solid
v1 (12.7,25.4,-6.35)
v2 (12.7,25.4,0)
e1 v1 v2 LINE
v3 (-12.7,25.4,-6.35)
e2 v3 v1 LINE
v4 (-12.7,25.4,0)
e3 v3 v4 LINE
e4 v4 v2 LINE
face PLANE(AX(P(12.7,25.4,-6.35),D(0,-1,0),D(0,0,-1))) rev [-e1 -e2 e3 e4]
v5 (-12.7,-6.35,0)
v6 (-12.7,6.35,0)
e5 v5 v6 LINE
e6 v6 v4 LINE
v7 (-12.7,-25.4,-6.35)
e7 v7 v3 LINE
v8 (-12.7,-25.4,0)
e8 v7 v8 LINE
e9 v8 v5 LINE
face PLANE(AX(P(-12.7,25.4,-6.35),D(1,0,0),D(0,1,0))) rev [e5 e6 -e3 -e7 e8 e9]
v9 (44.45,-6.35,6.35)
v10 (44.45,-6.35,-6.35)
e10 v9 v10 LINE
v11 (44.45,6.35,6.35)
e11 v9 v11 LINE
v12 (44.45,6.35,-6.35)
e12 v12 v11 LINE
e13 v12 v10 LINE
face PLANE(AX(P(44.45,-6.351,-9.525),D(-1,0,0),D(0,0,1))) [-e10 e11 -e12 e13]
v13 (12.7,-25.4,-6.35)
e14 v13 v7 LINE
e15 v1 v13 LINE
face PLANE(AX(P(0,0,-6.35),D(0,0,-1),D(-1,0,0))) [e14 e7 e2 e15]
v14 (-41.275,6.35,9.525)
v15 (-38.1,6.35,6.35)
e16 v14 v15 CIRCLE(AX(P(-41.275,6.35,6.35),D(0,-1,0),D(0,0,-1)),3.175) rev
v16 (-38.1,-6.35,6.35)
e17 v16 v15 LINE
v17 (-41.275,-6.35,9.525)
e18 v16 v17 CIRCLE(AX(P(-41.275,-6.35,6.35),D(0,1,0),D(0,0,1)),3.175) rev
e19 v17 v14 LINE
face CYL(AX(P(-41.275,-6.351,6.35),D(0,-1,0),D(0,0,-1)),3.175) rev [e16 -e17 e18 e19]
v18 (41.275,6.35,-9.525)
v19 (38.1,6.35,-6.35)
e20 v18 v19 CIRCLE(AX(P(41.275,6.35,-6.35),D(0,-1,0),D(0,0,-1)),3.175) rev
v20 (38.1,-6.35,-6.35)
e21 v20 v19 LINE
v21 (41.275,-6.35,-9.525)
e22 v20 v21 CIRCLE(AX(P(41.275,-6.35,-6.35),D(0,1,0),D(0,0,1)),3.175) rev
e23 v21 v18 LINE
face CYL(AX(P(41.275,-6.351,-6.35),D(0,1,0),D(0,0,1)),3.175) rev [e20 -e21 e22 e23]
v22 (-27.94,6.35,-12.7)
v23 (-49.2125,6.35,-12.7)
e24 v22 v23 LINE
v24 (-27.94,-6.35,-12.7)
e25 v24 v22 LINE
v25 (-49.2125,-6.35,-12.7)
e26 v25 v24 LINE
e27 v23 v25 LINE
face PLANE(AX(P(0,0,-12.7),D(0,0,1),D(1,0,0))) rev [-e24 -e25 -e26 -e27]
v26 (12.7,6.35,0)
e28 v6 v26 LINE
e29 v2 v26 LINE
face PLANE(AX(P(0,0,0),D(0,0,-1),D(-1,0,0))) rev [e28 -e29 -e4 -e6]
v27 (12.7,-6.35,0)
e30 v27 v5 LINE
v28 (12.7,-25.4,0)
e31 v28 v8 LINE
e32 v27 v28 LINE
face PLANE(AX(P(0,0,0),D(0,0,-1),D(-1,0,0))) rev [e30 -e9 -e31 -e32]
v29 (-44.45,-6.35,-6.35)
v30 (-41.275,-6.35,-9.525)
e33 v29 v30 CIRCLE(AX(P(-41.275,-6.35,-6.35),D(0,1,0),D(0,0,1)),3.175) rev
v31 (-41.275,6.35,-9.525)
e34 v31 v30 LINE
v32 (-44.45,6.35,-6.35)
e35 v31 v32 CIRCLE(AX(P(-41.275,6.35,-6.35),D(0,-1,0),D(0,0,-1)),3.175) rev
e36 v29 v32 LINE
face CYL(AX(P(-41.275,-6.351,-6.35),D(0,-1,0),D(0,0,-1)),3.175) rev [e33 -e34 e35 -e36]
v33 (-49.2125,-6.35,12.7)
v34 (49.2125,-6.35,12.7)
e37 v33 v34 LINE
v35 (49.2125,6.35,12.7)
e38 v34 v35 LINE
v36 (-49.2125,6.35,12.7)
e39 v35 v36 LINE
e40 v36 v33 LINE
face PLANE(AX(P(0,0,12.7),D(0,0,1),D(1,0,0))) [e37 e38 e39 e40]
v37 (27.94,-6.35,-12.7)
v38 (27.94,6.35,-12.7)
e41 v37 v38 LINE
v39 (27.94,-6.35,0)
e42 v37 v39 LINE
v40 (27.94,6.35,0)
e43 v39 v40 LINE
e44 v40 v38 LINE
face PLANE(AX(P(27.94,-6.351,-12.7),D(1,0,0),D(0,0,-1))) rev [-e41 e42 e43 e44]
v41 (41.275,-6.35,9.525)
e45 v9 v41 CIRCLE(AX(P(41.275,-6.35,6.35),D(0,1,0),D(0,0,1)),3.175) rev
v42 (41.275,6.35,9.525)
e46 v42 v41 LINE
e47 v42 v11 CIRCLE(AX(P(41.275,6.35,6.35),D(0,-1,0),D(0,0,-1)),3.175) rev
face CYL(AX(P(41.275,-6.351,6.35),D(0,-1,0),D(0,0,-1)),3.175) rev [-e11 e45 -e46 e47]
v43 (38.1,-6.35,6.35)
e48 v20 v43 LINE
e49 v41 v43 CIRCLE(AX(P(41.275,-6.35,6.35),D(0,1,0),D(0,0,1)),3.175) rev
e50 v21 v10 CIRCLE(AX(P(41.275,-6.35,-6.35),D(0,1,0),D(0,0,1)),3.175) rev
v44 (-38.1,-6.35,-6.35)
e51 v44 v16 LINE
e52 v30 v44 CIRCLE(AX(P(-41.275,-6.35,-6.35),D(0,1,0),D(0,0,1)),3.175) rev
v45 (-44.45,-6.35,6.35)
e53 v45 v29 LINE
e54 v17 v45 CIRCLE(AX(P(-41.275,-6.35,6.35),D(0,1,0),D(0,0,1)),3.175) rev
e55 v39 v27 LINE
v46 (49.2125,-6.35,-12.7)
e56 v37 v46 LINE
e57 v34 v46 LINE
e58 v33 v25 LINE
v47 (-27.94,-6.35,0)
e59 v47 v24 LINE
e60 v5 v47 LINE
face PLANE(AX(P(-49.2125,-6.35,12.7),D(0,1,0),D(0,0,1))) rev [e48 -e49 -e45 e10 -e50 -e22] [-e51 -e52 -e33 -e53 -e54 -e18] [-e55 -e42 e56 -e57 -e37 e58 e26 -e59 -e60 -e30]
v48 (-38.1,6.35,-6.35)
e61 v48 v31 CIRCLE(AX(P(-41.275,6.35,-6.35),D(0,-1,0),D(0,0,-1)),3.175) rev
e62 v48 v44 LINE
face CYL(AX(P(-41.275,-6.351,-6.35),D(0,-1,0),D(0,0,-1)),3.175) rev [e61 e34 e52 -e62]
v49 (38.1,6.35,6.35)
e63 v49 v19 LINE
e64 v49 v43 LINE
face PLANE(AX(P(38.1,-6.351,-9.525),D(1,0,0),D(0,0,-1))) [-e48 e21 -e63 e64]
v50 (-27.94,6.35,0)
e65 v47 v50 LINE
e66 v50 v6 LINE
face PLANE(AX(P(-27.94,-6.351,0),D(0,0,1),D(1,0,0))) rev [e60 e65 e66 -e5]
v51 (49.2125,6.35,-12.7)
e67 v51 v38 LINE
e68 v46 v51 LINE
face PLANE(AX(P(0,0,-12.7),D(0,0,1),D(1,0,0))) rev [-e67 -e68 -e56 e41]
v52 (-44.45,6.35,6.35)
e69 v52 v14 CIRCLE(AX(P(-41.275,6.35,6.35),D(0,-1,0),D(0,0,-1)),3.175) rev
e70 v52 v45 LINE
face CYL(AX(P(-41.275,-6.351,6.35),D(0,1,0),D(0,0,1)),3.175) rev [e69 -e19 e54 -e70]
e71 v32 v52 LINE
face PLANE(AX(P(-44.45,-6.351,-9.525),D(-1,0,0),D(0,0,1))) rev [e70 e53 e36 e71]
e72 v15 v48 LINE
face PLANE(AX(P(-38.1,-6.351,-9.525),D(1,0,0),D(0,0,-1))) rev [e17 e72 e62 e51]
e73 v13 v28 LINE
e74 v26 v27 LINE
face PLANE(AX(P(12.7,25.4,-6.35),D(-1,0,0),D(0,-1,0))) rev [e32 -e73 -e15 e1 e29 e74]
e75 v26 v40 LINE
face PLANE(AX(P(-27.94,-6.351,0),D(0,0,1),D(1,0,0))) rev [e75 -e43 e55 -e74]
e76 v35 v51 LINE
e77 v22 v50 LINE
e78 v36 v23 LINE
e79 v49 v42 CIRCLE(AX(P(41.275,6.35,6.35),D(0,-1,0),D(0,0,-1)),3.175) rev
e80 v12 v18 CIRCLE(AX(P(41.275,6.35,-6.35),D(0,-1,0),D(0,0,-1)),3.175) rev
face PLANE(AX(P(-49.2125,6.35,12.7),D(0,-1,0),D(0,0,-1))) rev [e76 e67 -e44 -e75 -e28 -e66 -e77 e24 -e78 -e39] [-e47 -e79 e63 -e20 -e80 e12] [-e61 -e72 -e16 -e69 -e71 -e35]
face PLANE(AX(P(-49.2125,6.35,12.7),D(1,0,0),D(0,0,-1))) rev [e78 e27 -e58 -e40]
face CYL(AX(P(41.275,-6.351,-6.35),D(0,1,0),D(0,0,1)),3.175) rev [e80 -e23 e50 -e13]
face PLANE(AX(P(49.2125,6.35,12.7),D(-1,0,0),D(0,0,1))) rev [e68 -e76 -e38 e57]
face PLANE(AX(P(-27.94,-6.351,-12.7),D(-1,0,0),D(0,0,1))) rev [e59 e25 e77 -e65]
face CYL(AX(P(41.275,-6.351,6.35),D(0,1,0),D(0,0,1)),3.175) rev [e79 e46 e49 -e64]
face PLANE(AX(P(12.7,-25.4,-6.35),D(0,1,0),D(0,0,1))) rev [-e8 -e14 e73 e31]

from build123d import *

# Parameters (mm, degrees)
SKETCH1_W            = 98.425
SKETCH1_H            = 12.7
BOSS_EXTRUDE1_DEPTH  = 12.7
CUT_EXTRUDE1_REACH   = 54.388
SKETCH2_W            = 6.35
SKETCH2_H            = 19.05
FILLET1_R            = 3.175
FILLET2_R            = 3.175
FILLET3_R            = 3.175
FILLET4_R            = 3.175
FILLET1_OF_MIRROR1_R = 3.175
FILLET2_OF_MIRROR1_R = 3.175
FILLET3_OF_MIRROR1_R = 3.175
FILLET4_OF_MIRROR1_R = 3.175
CUT_EXTRUDE2_REACH   = 54.388
SKETCH5_W            = 55.88
SKETCH5_H            = 12.7
SKETCH6_W            = 25.4
SKETCH6_H            = 50.8
BOSS_EXTRUDE3_DEPTH  = 6.35


with BuildPart() as part:
    # Sketch1 → Boss-Extrude1 (new, symmetric)
    with BuildSketch(Plane.XY):
        Rectangle(SKETCH1_W, SKETCH1_H)
    extrude(amount=BOSS_EXTRUDE1_DEPTH, both=True)

    # Sketch2 → Cut-Extrude1 (cut, up to next)
    with BuildSketch(Plane(origin=(0, 6.35, 0), x_dir=(1, 0, 0), z_dir=(0, 1, 0)), mode=Mode.PRIVATE) as cut_extrude1_sk1:
        with Locations((-41.275, 0)):
            Rectangle(SKETCH2_W, SKETCH2_H)
    cut_extrude1_tool1 = extrude(cut_extrude1_sk1.sketch, amount=-CUT_EXTRUDE1_REACH, mode=Mode.PRIVATE) & part.part
    cut_extrude1 = cut_extrude1_tool1.solids().sort_by_distance((-41.275, 6.35, 0))[0]
    add(cut_extrude1, mode=Mode.SUBTRACT)

    # Fillet1
    fillet1_edges = [part.edges().sort_by_distance(p)[0] for p in [
        (-44.45, 0, -9.525),
    ]]
    fillet(fillet1_edges, radius=FILLET1_R)

    # Fillet2
    fillet2_edges = [part.edges().sort_by_distance(p)[0] for p in [
        (-38.1, 0, -9.525),
    ]]
    fillet(fillet2_edges, radius=FILLET2_R - 0.0001)  # a hair under: the kernel refuses the full size

    # Fillet3
    fillet3_edges = [part.edges().sort_by_distance(p)[0] for p in [
        (-44.45, 0, 9.525),
    ]]
    fillet(fillet3_edges, radius=FILLET3_R)

    # Fillet4
    fillet4_edges = [part.edges().sort_by_distance(p)[0] for p in [
        (-38.1, 0, 9.525),
    ]]
    fillet(fillet4_edges, radius=FILLET4_R - 0.0001)  # a hair under: the kernel refuses the full size

    # Mirror1: Cut-Extrude1 across plane
    add(cut_extrude1.mirror(Plane(origin=(0, 0, 0), x_dir=(0, 0, 1), z_dir=(1, 0, 0))), mode=Mode.SUBTRACT)

    # Fillet1 of Mirror1
    fillet1_of_mirror1_edges = [part.edges().sort_by_distance(p)[0] for p in [
        (44.45, 0, -9.525),
    ]]
    fillet(fillet1_of_mirror1_edges, radius=FILLET1_OF_MIRROR1_R)

    # Fillet2 of Mirror1
    fillet2_of_mirror1_edges = [part.edges().sort_by_distance(p)[0] for p in [
        (38.1, 0, -9.525),
    ]]
    fillet(fillet2_of_mirror1_edges, radius=FILLET2_OF_MIRROR1_R - 0.0001)  # a hair under: the kernel refuses the full size

    # Fillet3 of Mirror1
    fillet3_of_mirror1_edges = [part.edges().sort_by_distance(p)[0] for p in [
        (44.45, 0, 9.525),
    ]]
    fillet(fillet3_of_mirror1_edges, radius=FILLET3_OF_MIRROR1_R)

    # Fillet4 of Mirror1
    fillet4_of_mirror1_edges = [part.edges().sort_by_distance(p)[0] for p in [
        (38.1, 0, 9.525),
    ]]
    fillet(fillet4_of_mirror1_edges, radius=FILLET4_OF_MIRROR1_R - 0.0001)  # a hair under: the kernel refuses the full size

    # Sketch5 → Cut-Extrude2 (cut, up to next)
    with BuildSketch(Plane(origin=(0, 6.35, 0), x_dir=(1, 0, 0), z_dir=(0, 1, 0)), mode=Mode.PRIVATE) as cut_extrude2_sk1:
        with Locations((0, 6.35)):
            Rectangle(SKETCH5_W, SKETCH5_H)
    cut_extrude2_tool1 = extrude(cut_extrude2_sk1.sketch, amount=-CUT_EXTRUDE2_REACH, mode=Mode.PRIVATE) & part.part
    add(cut_extrude2_tool1.solids().sort_by_distance((0, 6.35, -6.35))[0], mode=Mode.SUBTRACT)

    # Sketch6 → Boss-Extrude3 (add)
    with BuildSketch(Plane(origin=(0, 0, 0), x_dir=(-1, 0, 0), z_dir=(0, 0, -1))):
        Rectangle(SKETCH6_W, SKETCH6_H)
    extrude(amount=BOSS_EXTRUDE3_DEPTH)


solid = part.part
